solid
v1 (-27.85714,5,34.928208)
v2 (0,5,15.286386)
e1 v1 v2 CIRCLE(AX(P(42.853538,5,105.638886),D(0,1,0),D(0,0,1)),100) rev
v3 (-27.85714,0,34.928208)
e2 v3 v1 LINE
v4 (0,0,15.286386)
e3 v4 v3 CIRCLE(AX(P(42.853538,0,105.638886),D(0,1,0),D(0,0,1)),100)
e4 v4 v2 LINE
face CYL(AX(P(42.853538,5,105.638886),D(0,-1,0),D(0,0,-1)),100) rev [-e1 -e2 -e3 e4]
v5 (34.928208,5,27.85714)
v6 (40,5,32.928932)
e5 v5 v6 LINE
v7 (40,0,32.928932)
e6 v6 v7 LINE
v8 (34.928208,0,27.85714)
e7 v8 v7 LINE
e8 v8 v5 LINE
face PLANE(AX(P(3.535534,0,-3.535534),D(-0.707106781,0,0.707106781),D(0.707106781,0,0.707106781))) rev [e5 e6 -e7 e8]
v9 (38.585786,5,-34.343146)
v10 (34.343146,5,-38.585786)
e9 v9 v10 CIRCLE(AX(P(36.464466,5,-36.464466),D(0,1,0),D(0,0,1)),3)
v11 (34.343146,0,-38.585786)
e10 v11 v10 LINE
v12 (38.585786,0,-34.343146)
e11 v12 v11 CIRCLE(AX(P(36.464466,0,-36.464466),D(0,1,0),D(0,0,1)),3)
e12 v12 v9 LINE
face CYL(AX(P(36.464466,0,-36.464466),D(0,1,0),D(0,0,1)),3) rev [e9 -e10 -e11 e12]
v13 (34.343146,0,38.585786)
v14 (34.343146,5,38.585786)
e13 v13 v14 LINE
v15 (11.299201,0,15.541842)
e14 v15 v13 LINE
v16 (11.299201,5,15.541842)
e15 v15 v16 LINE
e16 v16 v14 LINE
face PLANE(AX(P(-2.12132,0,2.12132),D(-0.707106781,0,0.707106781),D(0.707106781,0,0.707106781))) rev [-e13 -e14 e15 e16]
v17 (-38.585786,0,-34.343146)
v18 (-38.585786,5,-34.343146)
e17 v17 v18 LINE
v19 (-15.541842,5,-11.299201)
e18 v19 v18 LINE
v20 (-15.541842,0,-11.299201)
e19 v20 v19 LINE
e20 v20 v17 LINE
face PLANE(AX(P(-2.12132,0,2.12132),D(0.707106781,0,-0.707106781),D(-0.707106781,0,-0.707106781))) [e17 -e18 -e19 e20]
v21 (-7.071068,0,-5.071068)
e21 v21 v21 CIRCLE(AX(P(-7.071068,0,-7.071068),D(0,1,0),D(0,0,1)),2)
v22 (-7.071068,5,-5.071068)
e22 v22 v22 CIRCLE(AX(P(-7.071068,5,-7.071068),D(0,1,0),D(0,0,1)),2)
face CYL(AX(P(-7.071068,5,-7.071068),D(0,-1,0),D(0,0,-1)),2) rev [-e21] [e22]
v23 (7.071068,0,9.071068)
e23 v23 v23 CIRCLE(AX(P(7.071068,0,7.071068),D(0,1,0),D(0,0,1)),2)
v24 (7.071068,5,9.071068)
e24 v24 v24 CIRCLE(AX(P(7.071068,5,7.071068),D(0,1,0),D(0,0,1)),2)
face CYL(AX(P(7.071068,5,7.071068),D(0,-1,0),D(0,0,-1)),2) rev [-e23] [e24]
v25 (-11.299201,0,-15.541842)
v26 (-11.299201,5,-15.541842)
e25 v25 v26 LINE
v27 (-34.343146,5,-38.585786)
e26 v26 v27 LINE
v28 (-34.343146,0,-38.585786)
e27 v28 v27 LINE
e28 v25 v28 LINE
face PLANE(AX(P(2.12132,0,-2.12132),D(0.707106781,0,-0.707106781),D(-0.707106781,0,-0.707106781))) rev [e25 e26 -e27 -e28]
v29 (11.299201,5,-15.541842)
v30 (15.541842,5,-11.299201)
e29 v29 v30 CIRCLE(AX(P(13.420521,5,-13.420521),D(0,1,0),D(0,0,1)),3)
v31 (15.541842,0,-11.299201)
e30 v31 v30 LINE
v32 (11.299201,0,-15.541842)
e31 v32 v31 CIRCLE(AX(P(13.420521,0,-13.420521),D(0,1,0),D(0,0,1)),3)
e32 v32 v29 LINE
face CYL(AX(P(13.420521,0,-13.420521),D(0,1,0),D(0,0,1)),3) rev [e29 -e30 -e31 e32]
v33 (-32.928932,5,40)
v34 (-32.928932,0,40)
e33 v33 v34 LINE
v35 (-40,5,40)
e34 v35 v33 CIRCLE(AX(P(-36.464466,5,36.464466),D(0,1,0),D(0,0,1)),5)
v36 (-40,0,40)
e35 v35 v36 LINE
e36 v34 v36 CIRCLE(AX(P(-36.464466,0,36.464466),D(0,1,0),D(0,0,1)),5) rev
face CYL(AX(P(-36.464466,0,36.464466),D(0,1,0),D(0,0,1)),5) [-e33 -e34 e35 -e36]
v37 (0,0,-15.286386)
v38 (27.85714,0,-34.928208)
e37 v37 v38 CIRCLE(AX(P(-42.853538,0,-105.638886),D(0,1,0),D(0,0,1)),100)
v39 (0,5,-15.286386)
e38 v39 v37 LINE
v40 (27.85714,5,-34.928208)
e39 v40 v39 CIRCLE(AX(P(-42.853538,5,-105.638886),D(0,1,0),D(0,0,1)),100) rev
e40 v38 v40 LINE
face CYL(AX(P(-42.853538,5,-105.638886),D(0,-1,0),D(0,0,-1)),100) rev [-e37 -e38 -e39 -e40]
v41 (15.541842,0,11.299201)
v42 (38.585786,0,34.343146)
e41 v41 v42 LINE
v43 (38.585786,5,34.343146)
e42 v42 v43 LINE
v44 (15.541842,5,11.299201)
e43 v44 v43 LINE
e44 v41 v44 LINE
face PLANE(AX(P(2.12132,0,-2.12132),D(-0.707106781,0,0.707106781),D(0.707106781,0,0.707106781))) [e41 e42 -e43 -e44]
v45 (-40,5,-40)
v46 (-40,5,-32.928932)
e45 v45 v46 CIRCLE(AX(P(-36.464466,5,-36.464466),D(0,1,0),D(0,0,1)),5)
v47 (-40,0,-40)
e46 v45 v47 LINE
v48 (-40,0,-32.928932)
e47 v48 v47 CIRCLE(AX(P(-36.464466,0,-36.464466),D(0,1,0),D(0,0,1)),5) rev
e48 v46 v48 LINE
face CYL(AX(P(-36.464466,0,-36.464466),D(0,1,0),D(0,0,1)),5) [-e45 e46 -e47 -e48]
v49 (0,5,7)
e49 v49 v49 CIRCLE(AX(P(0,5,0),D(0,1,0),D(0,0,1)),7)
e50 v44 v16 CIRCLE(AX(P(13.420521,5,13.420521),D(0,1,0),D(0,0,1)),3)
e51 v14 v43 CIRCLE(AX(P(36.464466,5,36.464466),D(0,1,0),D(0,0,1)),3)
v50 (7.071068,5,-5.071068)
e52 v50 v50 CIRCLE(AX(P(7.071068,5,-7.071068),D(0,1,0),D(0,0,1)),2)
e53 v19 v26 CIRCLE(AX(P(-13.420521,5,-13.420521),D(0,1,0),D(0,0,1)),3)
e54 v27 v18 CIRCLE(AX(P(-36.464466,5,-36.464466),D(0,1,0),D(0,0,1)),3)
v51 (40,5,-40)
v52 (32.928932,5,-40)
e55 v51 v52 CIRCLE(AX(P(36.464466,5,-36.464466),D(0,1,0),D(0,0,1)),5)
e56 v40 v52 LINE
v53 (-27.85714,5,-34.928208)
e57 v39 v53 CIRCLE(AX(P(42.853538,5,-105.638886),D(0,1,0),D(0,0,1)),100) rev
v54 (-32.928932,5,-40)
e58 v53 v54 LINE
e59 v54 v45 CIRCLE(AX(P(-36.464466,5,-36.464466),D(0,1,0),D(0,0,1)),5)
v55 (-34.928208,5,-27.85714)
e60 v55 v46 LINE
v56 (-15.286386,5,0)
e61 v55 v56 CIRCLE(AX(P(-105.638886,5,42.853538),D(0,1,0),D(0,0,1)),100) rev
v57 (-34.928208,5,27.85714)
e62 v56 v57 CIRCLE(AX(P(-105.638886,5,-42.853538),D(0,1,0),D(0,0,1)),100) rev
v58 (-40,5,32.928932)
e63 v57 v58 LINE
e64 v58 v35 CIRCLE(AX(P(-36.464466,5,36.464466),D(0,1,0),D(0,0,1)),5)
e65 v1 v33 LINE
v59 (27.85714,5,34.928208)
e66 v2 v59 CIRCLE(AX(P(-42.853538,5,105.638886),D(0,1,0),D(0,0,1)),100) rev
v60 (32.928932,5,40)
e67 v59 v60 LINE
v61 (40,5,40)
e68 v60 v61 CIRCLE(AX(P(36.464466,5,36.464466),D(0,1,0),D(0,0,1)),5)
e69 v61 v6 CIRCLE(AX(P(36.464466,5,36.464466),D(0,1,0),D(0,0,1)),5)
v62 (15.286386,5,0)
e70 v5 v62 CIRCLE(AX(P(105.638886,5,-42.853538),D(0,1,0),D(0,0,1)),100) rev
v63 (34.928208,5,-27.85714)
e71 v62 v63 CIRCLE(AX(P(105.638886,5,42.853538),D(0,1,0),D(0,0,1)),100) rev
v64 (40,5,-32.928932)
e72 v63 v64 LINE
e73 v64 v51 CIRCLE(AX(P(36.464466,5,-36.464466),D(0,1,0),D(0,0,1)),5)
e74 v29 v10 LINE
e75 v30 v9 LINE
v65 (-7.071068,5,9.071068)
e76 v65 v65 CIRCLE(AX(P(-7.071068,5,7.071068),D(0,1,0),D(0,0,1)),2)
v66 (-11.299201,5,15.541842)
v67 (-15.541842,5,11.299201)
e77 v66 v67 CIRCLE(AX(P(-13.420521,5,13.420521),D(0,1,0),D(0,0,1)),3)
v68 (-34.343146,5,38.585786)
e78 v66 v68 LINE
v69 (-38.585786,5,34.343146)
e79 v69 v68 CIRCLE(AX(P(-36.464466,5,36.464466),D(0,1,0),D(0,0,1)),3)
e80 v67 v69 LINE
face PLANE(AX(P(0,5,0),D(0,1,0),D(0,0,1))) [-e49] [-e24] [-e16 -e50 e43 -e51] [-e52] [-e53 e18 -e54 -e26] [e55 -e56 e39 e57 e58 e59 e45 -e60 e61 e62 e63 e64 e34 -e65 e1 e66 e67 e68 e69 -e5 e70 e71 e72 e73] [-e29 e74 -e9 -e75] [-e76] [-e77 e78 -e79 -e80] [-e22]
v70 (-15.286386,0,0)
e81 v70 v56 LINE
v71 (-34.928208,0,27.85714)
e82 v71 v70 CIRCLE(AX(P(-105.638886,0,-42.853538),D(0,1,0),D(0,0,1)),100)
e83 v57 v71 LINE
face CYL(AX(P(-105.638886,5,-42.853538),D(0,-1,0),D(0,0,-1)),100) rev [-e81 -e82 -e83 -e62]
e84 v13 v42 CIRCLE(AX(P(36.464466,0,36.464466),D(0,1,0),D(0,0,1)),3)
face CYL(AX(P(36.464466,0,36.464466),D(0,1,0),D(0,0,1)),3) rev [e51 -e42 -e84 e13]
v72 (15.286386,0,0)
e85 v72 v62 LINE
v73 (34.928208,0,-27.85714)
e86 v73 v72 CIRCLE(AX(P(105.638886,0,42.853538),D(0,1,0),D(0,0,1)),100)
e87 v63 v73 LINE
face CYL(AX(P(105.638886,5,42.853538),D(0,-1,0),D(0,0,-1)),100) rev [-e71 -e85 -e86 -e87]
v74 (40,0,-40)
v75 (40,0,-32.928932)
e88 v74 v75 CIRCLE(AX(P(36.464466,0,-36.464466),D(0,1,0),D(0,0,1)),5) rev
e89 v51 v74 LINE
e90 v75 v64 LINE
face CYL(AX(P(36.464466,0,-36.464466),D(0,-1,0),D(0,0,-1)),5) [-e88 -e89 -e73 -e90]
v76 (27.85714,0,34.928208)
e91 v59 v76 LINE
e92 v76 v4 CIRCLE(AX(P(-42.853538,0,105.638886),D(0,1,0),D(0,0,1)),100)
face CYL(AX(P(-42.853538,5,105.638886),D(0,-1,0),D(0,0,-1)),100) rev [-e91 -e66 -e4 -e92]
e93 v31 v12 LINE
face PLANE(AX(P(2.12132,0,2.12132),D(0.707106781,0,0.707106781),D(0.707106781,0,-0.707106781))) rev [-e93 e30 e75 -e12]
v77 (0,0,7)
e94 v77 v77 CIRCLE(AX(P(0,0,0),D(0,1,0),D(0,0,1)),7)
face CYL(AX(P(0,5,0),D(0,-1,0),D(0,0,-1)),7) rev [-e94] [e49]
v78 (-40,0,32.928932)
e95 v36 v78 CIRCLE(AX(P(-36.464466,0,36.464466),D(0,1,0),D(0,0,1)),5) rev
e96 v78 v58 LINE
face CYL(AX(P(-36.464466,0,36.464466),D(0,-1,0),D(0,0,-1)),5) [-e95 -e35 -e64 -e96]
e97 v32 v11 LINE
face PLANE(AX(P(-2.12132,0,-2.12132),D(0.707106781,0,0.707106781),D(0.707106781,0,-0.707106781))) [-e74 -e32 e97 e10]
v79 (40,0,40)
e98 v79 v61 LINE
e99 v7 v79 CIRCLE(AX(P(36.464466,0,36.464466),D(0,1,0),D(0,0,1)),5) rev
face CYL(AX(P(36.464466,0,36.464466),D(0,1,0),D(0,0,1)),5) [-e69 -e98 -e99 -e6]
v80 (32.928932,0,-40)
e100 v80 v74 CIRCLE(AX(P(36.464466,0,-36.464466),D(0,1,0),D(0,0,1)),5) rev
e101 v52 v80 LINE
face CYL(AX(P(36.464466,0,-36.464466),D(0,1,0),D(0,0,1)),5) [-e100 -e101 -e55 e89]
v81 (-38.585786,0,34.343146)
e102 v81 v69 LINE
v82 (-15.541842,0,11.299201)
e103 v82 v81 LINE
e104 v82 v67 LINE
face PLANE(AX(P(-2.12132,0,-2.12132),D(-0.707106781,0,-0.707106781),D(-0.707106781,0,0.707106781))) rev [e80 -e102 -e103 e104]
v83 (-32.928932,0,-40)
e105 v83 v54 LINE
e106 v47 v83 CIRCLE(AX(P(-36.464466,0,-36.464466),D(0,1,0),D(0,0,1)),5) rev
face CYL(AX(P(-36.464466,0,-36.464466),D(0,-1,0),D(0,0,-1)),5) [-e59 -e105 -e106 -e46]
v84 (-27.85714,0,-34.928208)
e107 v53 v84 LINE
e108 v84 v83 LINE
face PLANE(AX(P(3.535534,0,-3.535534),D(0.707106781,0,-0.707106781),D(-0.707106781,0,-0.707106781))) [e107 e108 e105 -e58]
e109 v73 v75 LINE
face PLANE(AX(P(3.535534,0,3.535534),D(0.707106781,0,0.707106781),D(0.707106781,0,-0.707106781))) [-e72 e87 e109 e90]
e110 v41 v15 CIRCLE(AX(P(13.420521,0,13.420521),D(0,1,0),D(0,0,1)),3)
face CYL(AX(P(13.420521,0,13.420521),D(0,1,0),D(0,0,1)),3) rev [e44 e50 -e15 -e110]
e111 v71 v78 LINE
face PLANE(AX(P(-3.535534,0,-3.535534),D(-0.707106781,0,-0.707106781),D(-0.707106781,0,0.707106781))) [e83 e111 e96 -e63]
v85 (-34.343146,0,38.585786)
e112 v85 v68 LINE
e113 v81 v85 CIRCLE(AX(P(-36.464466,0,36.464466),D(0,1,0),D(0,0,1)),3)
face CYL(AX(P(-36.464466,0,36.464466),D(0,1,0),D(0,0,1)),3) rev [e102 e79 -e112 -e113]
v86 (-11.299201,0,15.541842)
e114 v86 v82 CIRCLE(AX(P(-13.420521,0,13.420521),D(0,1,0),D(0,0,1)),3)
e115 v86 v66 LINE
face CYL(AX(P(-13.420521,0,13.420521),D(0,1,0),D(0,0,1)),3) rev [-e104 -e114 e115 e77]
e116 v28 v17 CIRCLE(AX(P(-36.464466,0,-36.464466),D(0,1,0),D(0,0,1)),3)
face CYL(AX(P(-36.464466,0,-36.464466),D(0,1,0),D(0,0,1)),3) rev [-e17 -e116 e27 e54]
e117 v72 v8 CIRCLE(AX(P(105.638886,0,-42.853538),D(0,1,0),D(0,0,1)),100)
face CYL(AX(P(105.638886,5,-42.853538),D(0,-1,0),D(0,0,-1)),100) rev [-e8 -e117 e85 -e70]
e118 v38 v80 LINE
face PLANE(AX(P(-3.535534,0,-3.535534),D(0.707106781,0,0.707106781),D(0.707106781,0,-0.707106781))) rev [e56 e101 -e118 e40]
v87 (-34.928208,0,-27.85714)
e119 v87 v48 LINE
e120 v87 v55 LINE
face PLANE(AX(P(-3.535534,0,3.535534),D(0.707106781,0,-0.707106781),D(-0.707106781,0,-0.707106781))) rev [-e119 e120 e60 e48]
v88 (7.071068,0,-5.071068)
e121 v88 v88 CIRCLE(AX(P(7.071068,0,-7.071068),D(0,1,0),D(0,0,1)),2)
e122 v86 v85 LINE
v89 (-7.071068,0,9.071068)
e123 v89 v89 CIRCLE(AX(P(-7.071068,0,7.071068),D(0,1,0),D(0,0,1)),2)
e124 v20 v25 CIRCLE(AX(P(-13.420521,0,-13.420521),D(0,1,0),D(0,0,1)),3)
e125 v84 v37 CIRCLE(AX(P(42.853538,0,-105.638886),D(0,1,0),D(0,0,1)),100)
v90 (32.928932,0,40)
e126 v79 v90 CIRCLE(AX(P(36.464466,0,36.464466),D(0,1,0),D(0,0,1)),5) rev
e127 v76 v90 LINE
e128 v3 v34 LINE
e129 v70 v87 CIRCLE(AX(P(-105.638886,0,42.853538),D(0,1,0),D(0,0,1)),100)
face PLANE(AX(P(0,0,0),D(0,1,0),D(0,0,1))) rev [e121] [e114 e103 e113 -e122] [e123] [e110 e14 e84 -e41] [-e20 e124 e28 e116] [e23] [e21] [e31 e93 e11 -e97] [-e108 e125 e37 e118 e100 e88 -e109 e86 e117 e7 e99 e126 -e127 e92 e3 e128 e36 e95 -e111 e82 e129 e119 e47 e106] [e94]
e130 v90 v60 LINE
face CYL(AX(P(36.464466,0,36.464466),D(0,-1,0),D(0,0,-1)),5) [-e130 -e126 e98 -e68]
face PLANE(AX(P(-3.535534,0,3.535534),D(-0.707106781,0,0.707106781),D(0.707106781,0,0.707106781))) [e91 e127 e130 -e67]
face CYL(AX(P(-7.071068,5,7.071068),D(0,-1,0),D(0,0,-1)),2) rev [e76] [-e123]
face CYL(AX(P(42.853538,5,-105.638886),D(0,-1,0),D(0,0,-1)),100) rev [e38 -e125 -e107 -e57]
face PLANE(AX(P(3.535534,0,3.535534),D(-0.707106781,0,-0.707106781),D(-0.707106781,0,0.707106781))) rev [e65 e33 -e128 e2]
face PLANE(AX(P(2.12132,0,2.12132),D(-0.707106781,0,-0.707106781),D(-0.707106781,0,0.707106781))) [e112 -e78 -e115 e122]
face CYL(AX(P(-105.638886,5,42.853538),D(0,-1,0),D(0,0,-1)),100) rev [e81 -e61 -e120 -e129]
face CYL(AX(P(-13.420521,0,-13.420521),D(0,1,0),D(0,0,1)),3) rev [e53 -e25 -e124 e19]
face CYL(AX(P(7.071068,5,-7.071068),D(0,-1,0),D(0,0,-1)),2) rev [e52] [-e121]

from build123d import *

# Parameters (mm, degrees)
SKETCH1_R           = 14
SKETCH1_R_2         = 2
SKETCH1_R_3         = 7
BOSS_EXTRUDE1_DEPTH = 5
BOSS_EXTRUDE3_START = -5
BOSS_EXTRUDE3_DEPTH = 5
FILLET1_R           = 5
FILLET2_R           = 100


# Some blends are built 0.0001 mm under size
with BuildPart() as part:
    # Sketch1 → Boss-Extrude1 (new body)
    with BuildSketch(Plane(origin=(0, 0, 0), x_dir=(1, 0, 0), z_dir=(0, 1, 0))):
        with Locations(Location((0, 0, 0), (0, 0, 270))):
            Circle(SKETCH1_R)
        with Locations(Location((7.071067812, 7.071067812, 0), (0, 0, 270))):
            Circle(SKETCH1_R_2, mode=Mode.SUBTRACT)
        with Locations(Location((7.071067812, -7.071067812, 0), (0, 0, 270))):
            Circle(SKETCH1_R_2, mode=Mode.SUBTRACT)
        with Locations(Location((-7.071067812, -7.071067812, 0), (0, 0, 270))):
            Circle(SKETCH1_R_2, mode=Mode.SUBTRACT)
        with Locations(Location((-7.071067812, 7.071067812, 0), (0, 0, 270))):
            Circle(SKETCH1_R_2, mode=Mode.SUBTRACT)
        with Locations(Location((0, 0, 0), (0, 0, 270))):
            Circle(SKETCH1_R_3, mode=Mode.SUBTRACT)
    extrude(amount=BOSS_EXTRUDE1_DEPTH)

    # Sketch4 → Boss-Extrude3 (add)
    # profile 1 of 7: a face of its own
    with BuildSketch(Plane(origin=(0, 5, 0), x_dir=(1, 0, 0), z_dir=(0, 1, 0)).offset(BOSS_EXTRUDE3_START)):
        with BuildLine():
            ThreePointArc((-5.711087099, -12.78215491), (-7.937253933, -11.532562595), (-9.899494937, -9.899494937))
            ThreePointArc((-9.899494937, -9.899494937), (-11.532562595, -7.937253933), (-12.78215491, -5.711087099))
            Line((-12.78215491, -5.711087099), (-43.535533906, -36.464466094))
            Line((-43.535533906, -36.464466094), (-36.464466094, -43.535533906))
            Line((-36.464466094, -43.535533906), (-5.711087099, -12.78215491))
        make_face()
        with BuildLine():
            ThreePointArc((-15.541841567, -11.29920088), (-11.29920088, -11.29920088), (-11.29920088, -15.541841567))
            Line((-11.29920088, -15.541841567), (-34.343145751, -38.585786438))
            ThreePointArc((-34.343145751, -38.585786438), (-38.585786438, -38.585786438), (-38.585786438, -34.343145751))
            Line((-38.585786438, -34.343145751), (-15.541841567, -11.29920088))
        make_face(mode=Mode.SUBTRACT)
    # profile 2 of 7: a face of its own
    with BuildSketch(Plane(origin=(0, 5, 0), x_dir=(1, 0, 0), z_dir=(0, 1, 0)).offset(BOSS_EXTRUDE3_START)):
        with BuildLine():
            ThreePointArc((-10.420735139, 9.349239497), (-10.163839474, 9.627895261), (-9.899494937, 9.899494937))
            Line((-9.899494937, 9.899494937), (-11.29920088, 11.29920088))
            ThreePointArc((-11.29920088, 11.29920088), (-13.420521224, 10.420521224), (-15.541841567, 11.29920088))
            Line((-15.541841567, 11.29920088), (-38.585786438, 34.343145751))
            ThreePointArc((-38.585786438, 34.343145751), (-39.464466094, 36.464466094), (-38.585786438, 38.585786438))
            Line((-38.585786438, 38.585786438), (-40, 40))
            Line((-40, 40), (-43.535533906, 36.464466094))
            Line((-43.535533906, 36.464466094), (-13.420521224, 6.349453412))
            Line((-13.420521224, 6.349453412), (-10.420735139, 9.349239497))
        make_face()
    # profile 3 of 7: a face of its own
    with BuildSketch(Plane(origin=(0, 5, 0), x_dir=(1, 0, 0), z_dir=(0, 1, 0)).offset(BOSS_EXTRUDE3_START)):
        with BuildLine():
            ThreePointArc((-12.78215491, 5.711087099), (-11.743192278, 7.622167351), (-10.420735139, 9.349239497))
            Line((-10.420735139, 9.349239497), (-13.420521224, 6.349453412))
            Line((-13.420521224, 6.349453412), (-12.78215491, 5.711087099))
        make_face()
    # profile 4 of 7: a face of its own
    with BuildSketch(Plane(origin=(0, 5, 0), x_dir=(1, 0, 0), z_dir=(0, 1, 0)).offset(BOSS_EXTRUDE3_START)):
        with BuildLine():
            Line((-11.29920088, 11.29920088), (-9.899494937, 9.899494937))
            ThreePointArc((-9.899494937, 9.899494937), (-9.627895261, 10.163839474), (-9.349239497, 10.420735139))
            Line((-9.349239497, 10.420735139), (-6.349453412, 13.420521224))
            Line((-6.349453412, 13.420521224), (-36.464466094, 43.535533906))
            Line((-36.464466094, 43.535533906), (-40, 40))
            Line((-40, 40), (-38.585786438, 38.585786438))
            ThreePointArc((-38.585786438, 38.585786438), (-36.464466094, 39.464466094), (-34.343145751, 38.585786438))
            Line((-34.343145751, 38.585786438), (-11.29920088, 15.541841567))
            ThreePointArc((-11.29920088, 15.541841567), (-10.420521224, 13.420521224), (-11.29920088, 11.29920088))
        make_face()
    # profile 5 of 7: a face of its own
    with BuildSketch(Plane(origin=(0, 5, 0), x_dir=(1, 0, 0), z_dir=(0, 1, 0)).offset(BOSS_EXTRUDE3_START)):
        with BuildLine():
            Line((-6.349453412, 13.420521224), (-9.349239497, 10.420735139))
            ThreePointArc((-9.349239497, 10.420735139), (-7.622167351, 11.743192278), (-5.711087099, 12.78215491))
            Line((-5.711087099, 12.78215491), (-6.349453412, 13.420521224))
        make_face()
    # profile 6 of 7: a face of its own
    with BuildSketch(Plane(origin=(0, 5, 0), x_dir=(1, 0, 0), z_dir=(0, 1, 0)).offset(BOSS_EXTRUDE3_START)):
        with BuildLine():
            ThreePointArc((5.711087099, 12.78215491), (7.937253933, 11.532562595), (9.899494937, 9.899494937))
            ThreePointArc((9.899494937, 9.899494937), (11.532562595, 7.937253933), (12.78215491, 5.711087099))
            Line((12.78215491, 5.711087099), (43.535533906, 36.464466094))
            Line((43.535533906, 36.464466094), (36.464466094, 43.535533906))
            Line((36.464466094, 43.535533906), (5.711087099, 12.78215491))
        make_face()
        with BuildLine():
            ThreePointArc((15.541841567, 11.29920088), (11.29920088, 11.29920088), (11.29920088, 15.541841567))
            Line((11.29920088, 15.541841567), (34.343145751, 38.585786438))
            ThreePointArc((34.343145751, 38.585786438), (38.585786438, 38.585786438), (38.585786438, 34.343145751))
            Line((38.585786438, 34.343145751), (15.541841567, 11.29920088))
        make_face(mode=Mode.SUBTRACT)
    # profile 7 of 7: a face of its own
    with BuildSketch(Plane(origin=(0, 5, 0), x_dir=(1, 0, 0), z_dir=(0, 1, 0)).offset(BOSS_EXTRUDE3_START)):
        with BuildLine():
            ThreePointArc((12.78215491, -5.711087099), (11.532562595, -7.937253933), (9.899494937, -9.899494937))
            ThreePointArc((9.899494937, -9.899494937), (7.937253933, -11.532562595), (5.711087099, -12.78215491))
            Line((5.711087099, -12.78215491), (36.464466094, -43.535533906))
            Line((36.464466094, -43.535533906), (43.535533906, -36.464466094))
            Line((43.535533906, -36.464466094), (12.78215491, -5.711087099))
        make_face()
        with BuildLine():
            ThreePointArc((11.29920088, -15.541841567), (11.29920088, -11.29920088), (15.541841567, -11.29920088))
            Line((15.541841567, -11.29920088), (38.585786438, -34.343145751))
            ThreePointArc((38.585786438, -34.343145751), (38.585786438, -38.585786438), (34.343145751, -38.585786438))
            Line((34.343145751, -38.585786438), (11.29920088, -15.541841567))
        make_face(mode=Mode.SUBTRACT)
    extrude(amount=BOSS_EXTRUDE3_DEPTH)

    # Fillet1
    fillet1_edges = [part.edges().sort_by_distance(p)[0] for p in [
        (-36.464466094, 2.5, 43.535533906),
        (-43.535533906, 2.5, 36.464466094),
        (-43.535533906, 2.5, -36.464466094),
        (-36.464466094, 2.5, -43.535533906),
        (36.464466094, 2.5, -43.535533906),
        (43.535533906, 2.5, -36.464466094),
        (36.464466094, 2.5, 43.535533906),
        (43.535533906, 2.5, 36.464466094),
    ]]
    fillet(fillet1_edges, radius=FILLET1_R - 0.0001)  # a hair under: the kernel refuses the full size

    # Fillet2
    # the kernel refuses this fillet: 100 mm, written as the material it adds along each edge
    with BuildSketch(Plane(origin=(-5.711087099, 0, 12.78215491), x_dir=(0.9998484998051017, 0, 0.017406247082228966), z_dir=(0, 1, 0)), Plane(origin=(-12.78215491, 0, -5.711087099), x_dir=(-0.017406247082221098, 0, 0.9998484998051018), z_dir=(0, 1, 0))) as fillet2_piece_1:
        with BuildLine():
            CenterArc((50.173554479, -91.997335747), FILLET2_R, 113.07781271, 22.919542152)
            Line((-21.757218493, -22.528177844), (0, 0))
            ThreePointArc((0, 0), (5.487732521, -1.120372995), (10.975465042, 0))
        make_face()
    extrude(amount=5)
    with BuildSketch(Plane(origin=(5.711087099, 0, 12.78215491), x_dir=(0.7071067811865421, 0, 0.7071067811865529), z_dir=(0, 1, 0)), Plane(origin=(-12.78215491, 0, 5.711087099), x_dir=(-0.7071067811865551, 0, 0.7071067811865399), z_dir=(0, 1, 0))) as fillet2_piece_2:
        with BuildLine():
            CenterArc((31.31924893, -100), FILLET2_R, 90, 22.919542152)
            ThreePointArc((-7.624563141, -7.894736842), (-3.006388615, -4.725682106), (0, 0))
            Line((0, 0), (31.31924893, 0))
        make_face()
    extrude(amount=5)
    with BuildSketch(Plane(origin=(12.78215491, 0, 5.711087099), x_dir=(0.7071067811865436, 0, 0.7071067811865516), z_dir=(0, 1, 0)), Plane(origin=(5.711087099, 0, -12.78215491), x_dir=(0.7071067811865498, 0, -0.7071067811865454), z_dir=(0, 1, 0))) as fillet2_piece_3:
        with BuildLine():
            CenterArc((31.31924893, 100), FILLET2_R, 247.080457848, 22.919542152)
            ThreePointArc((-7.624563141, 7.894736842), (-3.006388615, 4.725682106), (0, 0))
            Line((0, 0), (31.31924893, 0))
        make_face()
    extrude(amount=5)
    with BuildSketch(Plane(origin=(12.78215491, 0, -5.711087099), x_dir=(0.01740624708221406, 0, 0.9998484998051019), z_dir=(0, 1, 0)), Plane(origin=(-5.711087099, 0, -12.78215491), x_dir=(0.9998484998051018, 0, -0.017406247082221094), z_dir=(0, 1, 0))) as fillet2_piece_4:
        with BuildLine():
            CenterArc((50.173554479, 91.997335747), FILLET2_R, 224.002645138, 22.919542152)
            Line((-21.757218493, 22.528177844), (0, 0))
            ThreePointArc((0, 0), (5.487732521, 1.120372995), (10.975465042, 0))
        make_face()
    extrude(amount=5)


solid = part.part
